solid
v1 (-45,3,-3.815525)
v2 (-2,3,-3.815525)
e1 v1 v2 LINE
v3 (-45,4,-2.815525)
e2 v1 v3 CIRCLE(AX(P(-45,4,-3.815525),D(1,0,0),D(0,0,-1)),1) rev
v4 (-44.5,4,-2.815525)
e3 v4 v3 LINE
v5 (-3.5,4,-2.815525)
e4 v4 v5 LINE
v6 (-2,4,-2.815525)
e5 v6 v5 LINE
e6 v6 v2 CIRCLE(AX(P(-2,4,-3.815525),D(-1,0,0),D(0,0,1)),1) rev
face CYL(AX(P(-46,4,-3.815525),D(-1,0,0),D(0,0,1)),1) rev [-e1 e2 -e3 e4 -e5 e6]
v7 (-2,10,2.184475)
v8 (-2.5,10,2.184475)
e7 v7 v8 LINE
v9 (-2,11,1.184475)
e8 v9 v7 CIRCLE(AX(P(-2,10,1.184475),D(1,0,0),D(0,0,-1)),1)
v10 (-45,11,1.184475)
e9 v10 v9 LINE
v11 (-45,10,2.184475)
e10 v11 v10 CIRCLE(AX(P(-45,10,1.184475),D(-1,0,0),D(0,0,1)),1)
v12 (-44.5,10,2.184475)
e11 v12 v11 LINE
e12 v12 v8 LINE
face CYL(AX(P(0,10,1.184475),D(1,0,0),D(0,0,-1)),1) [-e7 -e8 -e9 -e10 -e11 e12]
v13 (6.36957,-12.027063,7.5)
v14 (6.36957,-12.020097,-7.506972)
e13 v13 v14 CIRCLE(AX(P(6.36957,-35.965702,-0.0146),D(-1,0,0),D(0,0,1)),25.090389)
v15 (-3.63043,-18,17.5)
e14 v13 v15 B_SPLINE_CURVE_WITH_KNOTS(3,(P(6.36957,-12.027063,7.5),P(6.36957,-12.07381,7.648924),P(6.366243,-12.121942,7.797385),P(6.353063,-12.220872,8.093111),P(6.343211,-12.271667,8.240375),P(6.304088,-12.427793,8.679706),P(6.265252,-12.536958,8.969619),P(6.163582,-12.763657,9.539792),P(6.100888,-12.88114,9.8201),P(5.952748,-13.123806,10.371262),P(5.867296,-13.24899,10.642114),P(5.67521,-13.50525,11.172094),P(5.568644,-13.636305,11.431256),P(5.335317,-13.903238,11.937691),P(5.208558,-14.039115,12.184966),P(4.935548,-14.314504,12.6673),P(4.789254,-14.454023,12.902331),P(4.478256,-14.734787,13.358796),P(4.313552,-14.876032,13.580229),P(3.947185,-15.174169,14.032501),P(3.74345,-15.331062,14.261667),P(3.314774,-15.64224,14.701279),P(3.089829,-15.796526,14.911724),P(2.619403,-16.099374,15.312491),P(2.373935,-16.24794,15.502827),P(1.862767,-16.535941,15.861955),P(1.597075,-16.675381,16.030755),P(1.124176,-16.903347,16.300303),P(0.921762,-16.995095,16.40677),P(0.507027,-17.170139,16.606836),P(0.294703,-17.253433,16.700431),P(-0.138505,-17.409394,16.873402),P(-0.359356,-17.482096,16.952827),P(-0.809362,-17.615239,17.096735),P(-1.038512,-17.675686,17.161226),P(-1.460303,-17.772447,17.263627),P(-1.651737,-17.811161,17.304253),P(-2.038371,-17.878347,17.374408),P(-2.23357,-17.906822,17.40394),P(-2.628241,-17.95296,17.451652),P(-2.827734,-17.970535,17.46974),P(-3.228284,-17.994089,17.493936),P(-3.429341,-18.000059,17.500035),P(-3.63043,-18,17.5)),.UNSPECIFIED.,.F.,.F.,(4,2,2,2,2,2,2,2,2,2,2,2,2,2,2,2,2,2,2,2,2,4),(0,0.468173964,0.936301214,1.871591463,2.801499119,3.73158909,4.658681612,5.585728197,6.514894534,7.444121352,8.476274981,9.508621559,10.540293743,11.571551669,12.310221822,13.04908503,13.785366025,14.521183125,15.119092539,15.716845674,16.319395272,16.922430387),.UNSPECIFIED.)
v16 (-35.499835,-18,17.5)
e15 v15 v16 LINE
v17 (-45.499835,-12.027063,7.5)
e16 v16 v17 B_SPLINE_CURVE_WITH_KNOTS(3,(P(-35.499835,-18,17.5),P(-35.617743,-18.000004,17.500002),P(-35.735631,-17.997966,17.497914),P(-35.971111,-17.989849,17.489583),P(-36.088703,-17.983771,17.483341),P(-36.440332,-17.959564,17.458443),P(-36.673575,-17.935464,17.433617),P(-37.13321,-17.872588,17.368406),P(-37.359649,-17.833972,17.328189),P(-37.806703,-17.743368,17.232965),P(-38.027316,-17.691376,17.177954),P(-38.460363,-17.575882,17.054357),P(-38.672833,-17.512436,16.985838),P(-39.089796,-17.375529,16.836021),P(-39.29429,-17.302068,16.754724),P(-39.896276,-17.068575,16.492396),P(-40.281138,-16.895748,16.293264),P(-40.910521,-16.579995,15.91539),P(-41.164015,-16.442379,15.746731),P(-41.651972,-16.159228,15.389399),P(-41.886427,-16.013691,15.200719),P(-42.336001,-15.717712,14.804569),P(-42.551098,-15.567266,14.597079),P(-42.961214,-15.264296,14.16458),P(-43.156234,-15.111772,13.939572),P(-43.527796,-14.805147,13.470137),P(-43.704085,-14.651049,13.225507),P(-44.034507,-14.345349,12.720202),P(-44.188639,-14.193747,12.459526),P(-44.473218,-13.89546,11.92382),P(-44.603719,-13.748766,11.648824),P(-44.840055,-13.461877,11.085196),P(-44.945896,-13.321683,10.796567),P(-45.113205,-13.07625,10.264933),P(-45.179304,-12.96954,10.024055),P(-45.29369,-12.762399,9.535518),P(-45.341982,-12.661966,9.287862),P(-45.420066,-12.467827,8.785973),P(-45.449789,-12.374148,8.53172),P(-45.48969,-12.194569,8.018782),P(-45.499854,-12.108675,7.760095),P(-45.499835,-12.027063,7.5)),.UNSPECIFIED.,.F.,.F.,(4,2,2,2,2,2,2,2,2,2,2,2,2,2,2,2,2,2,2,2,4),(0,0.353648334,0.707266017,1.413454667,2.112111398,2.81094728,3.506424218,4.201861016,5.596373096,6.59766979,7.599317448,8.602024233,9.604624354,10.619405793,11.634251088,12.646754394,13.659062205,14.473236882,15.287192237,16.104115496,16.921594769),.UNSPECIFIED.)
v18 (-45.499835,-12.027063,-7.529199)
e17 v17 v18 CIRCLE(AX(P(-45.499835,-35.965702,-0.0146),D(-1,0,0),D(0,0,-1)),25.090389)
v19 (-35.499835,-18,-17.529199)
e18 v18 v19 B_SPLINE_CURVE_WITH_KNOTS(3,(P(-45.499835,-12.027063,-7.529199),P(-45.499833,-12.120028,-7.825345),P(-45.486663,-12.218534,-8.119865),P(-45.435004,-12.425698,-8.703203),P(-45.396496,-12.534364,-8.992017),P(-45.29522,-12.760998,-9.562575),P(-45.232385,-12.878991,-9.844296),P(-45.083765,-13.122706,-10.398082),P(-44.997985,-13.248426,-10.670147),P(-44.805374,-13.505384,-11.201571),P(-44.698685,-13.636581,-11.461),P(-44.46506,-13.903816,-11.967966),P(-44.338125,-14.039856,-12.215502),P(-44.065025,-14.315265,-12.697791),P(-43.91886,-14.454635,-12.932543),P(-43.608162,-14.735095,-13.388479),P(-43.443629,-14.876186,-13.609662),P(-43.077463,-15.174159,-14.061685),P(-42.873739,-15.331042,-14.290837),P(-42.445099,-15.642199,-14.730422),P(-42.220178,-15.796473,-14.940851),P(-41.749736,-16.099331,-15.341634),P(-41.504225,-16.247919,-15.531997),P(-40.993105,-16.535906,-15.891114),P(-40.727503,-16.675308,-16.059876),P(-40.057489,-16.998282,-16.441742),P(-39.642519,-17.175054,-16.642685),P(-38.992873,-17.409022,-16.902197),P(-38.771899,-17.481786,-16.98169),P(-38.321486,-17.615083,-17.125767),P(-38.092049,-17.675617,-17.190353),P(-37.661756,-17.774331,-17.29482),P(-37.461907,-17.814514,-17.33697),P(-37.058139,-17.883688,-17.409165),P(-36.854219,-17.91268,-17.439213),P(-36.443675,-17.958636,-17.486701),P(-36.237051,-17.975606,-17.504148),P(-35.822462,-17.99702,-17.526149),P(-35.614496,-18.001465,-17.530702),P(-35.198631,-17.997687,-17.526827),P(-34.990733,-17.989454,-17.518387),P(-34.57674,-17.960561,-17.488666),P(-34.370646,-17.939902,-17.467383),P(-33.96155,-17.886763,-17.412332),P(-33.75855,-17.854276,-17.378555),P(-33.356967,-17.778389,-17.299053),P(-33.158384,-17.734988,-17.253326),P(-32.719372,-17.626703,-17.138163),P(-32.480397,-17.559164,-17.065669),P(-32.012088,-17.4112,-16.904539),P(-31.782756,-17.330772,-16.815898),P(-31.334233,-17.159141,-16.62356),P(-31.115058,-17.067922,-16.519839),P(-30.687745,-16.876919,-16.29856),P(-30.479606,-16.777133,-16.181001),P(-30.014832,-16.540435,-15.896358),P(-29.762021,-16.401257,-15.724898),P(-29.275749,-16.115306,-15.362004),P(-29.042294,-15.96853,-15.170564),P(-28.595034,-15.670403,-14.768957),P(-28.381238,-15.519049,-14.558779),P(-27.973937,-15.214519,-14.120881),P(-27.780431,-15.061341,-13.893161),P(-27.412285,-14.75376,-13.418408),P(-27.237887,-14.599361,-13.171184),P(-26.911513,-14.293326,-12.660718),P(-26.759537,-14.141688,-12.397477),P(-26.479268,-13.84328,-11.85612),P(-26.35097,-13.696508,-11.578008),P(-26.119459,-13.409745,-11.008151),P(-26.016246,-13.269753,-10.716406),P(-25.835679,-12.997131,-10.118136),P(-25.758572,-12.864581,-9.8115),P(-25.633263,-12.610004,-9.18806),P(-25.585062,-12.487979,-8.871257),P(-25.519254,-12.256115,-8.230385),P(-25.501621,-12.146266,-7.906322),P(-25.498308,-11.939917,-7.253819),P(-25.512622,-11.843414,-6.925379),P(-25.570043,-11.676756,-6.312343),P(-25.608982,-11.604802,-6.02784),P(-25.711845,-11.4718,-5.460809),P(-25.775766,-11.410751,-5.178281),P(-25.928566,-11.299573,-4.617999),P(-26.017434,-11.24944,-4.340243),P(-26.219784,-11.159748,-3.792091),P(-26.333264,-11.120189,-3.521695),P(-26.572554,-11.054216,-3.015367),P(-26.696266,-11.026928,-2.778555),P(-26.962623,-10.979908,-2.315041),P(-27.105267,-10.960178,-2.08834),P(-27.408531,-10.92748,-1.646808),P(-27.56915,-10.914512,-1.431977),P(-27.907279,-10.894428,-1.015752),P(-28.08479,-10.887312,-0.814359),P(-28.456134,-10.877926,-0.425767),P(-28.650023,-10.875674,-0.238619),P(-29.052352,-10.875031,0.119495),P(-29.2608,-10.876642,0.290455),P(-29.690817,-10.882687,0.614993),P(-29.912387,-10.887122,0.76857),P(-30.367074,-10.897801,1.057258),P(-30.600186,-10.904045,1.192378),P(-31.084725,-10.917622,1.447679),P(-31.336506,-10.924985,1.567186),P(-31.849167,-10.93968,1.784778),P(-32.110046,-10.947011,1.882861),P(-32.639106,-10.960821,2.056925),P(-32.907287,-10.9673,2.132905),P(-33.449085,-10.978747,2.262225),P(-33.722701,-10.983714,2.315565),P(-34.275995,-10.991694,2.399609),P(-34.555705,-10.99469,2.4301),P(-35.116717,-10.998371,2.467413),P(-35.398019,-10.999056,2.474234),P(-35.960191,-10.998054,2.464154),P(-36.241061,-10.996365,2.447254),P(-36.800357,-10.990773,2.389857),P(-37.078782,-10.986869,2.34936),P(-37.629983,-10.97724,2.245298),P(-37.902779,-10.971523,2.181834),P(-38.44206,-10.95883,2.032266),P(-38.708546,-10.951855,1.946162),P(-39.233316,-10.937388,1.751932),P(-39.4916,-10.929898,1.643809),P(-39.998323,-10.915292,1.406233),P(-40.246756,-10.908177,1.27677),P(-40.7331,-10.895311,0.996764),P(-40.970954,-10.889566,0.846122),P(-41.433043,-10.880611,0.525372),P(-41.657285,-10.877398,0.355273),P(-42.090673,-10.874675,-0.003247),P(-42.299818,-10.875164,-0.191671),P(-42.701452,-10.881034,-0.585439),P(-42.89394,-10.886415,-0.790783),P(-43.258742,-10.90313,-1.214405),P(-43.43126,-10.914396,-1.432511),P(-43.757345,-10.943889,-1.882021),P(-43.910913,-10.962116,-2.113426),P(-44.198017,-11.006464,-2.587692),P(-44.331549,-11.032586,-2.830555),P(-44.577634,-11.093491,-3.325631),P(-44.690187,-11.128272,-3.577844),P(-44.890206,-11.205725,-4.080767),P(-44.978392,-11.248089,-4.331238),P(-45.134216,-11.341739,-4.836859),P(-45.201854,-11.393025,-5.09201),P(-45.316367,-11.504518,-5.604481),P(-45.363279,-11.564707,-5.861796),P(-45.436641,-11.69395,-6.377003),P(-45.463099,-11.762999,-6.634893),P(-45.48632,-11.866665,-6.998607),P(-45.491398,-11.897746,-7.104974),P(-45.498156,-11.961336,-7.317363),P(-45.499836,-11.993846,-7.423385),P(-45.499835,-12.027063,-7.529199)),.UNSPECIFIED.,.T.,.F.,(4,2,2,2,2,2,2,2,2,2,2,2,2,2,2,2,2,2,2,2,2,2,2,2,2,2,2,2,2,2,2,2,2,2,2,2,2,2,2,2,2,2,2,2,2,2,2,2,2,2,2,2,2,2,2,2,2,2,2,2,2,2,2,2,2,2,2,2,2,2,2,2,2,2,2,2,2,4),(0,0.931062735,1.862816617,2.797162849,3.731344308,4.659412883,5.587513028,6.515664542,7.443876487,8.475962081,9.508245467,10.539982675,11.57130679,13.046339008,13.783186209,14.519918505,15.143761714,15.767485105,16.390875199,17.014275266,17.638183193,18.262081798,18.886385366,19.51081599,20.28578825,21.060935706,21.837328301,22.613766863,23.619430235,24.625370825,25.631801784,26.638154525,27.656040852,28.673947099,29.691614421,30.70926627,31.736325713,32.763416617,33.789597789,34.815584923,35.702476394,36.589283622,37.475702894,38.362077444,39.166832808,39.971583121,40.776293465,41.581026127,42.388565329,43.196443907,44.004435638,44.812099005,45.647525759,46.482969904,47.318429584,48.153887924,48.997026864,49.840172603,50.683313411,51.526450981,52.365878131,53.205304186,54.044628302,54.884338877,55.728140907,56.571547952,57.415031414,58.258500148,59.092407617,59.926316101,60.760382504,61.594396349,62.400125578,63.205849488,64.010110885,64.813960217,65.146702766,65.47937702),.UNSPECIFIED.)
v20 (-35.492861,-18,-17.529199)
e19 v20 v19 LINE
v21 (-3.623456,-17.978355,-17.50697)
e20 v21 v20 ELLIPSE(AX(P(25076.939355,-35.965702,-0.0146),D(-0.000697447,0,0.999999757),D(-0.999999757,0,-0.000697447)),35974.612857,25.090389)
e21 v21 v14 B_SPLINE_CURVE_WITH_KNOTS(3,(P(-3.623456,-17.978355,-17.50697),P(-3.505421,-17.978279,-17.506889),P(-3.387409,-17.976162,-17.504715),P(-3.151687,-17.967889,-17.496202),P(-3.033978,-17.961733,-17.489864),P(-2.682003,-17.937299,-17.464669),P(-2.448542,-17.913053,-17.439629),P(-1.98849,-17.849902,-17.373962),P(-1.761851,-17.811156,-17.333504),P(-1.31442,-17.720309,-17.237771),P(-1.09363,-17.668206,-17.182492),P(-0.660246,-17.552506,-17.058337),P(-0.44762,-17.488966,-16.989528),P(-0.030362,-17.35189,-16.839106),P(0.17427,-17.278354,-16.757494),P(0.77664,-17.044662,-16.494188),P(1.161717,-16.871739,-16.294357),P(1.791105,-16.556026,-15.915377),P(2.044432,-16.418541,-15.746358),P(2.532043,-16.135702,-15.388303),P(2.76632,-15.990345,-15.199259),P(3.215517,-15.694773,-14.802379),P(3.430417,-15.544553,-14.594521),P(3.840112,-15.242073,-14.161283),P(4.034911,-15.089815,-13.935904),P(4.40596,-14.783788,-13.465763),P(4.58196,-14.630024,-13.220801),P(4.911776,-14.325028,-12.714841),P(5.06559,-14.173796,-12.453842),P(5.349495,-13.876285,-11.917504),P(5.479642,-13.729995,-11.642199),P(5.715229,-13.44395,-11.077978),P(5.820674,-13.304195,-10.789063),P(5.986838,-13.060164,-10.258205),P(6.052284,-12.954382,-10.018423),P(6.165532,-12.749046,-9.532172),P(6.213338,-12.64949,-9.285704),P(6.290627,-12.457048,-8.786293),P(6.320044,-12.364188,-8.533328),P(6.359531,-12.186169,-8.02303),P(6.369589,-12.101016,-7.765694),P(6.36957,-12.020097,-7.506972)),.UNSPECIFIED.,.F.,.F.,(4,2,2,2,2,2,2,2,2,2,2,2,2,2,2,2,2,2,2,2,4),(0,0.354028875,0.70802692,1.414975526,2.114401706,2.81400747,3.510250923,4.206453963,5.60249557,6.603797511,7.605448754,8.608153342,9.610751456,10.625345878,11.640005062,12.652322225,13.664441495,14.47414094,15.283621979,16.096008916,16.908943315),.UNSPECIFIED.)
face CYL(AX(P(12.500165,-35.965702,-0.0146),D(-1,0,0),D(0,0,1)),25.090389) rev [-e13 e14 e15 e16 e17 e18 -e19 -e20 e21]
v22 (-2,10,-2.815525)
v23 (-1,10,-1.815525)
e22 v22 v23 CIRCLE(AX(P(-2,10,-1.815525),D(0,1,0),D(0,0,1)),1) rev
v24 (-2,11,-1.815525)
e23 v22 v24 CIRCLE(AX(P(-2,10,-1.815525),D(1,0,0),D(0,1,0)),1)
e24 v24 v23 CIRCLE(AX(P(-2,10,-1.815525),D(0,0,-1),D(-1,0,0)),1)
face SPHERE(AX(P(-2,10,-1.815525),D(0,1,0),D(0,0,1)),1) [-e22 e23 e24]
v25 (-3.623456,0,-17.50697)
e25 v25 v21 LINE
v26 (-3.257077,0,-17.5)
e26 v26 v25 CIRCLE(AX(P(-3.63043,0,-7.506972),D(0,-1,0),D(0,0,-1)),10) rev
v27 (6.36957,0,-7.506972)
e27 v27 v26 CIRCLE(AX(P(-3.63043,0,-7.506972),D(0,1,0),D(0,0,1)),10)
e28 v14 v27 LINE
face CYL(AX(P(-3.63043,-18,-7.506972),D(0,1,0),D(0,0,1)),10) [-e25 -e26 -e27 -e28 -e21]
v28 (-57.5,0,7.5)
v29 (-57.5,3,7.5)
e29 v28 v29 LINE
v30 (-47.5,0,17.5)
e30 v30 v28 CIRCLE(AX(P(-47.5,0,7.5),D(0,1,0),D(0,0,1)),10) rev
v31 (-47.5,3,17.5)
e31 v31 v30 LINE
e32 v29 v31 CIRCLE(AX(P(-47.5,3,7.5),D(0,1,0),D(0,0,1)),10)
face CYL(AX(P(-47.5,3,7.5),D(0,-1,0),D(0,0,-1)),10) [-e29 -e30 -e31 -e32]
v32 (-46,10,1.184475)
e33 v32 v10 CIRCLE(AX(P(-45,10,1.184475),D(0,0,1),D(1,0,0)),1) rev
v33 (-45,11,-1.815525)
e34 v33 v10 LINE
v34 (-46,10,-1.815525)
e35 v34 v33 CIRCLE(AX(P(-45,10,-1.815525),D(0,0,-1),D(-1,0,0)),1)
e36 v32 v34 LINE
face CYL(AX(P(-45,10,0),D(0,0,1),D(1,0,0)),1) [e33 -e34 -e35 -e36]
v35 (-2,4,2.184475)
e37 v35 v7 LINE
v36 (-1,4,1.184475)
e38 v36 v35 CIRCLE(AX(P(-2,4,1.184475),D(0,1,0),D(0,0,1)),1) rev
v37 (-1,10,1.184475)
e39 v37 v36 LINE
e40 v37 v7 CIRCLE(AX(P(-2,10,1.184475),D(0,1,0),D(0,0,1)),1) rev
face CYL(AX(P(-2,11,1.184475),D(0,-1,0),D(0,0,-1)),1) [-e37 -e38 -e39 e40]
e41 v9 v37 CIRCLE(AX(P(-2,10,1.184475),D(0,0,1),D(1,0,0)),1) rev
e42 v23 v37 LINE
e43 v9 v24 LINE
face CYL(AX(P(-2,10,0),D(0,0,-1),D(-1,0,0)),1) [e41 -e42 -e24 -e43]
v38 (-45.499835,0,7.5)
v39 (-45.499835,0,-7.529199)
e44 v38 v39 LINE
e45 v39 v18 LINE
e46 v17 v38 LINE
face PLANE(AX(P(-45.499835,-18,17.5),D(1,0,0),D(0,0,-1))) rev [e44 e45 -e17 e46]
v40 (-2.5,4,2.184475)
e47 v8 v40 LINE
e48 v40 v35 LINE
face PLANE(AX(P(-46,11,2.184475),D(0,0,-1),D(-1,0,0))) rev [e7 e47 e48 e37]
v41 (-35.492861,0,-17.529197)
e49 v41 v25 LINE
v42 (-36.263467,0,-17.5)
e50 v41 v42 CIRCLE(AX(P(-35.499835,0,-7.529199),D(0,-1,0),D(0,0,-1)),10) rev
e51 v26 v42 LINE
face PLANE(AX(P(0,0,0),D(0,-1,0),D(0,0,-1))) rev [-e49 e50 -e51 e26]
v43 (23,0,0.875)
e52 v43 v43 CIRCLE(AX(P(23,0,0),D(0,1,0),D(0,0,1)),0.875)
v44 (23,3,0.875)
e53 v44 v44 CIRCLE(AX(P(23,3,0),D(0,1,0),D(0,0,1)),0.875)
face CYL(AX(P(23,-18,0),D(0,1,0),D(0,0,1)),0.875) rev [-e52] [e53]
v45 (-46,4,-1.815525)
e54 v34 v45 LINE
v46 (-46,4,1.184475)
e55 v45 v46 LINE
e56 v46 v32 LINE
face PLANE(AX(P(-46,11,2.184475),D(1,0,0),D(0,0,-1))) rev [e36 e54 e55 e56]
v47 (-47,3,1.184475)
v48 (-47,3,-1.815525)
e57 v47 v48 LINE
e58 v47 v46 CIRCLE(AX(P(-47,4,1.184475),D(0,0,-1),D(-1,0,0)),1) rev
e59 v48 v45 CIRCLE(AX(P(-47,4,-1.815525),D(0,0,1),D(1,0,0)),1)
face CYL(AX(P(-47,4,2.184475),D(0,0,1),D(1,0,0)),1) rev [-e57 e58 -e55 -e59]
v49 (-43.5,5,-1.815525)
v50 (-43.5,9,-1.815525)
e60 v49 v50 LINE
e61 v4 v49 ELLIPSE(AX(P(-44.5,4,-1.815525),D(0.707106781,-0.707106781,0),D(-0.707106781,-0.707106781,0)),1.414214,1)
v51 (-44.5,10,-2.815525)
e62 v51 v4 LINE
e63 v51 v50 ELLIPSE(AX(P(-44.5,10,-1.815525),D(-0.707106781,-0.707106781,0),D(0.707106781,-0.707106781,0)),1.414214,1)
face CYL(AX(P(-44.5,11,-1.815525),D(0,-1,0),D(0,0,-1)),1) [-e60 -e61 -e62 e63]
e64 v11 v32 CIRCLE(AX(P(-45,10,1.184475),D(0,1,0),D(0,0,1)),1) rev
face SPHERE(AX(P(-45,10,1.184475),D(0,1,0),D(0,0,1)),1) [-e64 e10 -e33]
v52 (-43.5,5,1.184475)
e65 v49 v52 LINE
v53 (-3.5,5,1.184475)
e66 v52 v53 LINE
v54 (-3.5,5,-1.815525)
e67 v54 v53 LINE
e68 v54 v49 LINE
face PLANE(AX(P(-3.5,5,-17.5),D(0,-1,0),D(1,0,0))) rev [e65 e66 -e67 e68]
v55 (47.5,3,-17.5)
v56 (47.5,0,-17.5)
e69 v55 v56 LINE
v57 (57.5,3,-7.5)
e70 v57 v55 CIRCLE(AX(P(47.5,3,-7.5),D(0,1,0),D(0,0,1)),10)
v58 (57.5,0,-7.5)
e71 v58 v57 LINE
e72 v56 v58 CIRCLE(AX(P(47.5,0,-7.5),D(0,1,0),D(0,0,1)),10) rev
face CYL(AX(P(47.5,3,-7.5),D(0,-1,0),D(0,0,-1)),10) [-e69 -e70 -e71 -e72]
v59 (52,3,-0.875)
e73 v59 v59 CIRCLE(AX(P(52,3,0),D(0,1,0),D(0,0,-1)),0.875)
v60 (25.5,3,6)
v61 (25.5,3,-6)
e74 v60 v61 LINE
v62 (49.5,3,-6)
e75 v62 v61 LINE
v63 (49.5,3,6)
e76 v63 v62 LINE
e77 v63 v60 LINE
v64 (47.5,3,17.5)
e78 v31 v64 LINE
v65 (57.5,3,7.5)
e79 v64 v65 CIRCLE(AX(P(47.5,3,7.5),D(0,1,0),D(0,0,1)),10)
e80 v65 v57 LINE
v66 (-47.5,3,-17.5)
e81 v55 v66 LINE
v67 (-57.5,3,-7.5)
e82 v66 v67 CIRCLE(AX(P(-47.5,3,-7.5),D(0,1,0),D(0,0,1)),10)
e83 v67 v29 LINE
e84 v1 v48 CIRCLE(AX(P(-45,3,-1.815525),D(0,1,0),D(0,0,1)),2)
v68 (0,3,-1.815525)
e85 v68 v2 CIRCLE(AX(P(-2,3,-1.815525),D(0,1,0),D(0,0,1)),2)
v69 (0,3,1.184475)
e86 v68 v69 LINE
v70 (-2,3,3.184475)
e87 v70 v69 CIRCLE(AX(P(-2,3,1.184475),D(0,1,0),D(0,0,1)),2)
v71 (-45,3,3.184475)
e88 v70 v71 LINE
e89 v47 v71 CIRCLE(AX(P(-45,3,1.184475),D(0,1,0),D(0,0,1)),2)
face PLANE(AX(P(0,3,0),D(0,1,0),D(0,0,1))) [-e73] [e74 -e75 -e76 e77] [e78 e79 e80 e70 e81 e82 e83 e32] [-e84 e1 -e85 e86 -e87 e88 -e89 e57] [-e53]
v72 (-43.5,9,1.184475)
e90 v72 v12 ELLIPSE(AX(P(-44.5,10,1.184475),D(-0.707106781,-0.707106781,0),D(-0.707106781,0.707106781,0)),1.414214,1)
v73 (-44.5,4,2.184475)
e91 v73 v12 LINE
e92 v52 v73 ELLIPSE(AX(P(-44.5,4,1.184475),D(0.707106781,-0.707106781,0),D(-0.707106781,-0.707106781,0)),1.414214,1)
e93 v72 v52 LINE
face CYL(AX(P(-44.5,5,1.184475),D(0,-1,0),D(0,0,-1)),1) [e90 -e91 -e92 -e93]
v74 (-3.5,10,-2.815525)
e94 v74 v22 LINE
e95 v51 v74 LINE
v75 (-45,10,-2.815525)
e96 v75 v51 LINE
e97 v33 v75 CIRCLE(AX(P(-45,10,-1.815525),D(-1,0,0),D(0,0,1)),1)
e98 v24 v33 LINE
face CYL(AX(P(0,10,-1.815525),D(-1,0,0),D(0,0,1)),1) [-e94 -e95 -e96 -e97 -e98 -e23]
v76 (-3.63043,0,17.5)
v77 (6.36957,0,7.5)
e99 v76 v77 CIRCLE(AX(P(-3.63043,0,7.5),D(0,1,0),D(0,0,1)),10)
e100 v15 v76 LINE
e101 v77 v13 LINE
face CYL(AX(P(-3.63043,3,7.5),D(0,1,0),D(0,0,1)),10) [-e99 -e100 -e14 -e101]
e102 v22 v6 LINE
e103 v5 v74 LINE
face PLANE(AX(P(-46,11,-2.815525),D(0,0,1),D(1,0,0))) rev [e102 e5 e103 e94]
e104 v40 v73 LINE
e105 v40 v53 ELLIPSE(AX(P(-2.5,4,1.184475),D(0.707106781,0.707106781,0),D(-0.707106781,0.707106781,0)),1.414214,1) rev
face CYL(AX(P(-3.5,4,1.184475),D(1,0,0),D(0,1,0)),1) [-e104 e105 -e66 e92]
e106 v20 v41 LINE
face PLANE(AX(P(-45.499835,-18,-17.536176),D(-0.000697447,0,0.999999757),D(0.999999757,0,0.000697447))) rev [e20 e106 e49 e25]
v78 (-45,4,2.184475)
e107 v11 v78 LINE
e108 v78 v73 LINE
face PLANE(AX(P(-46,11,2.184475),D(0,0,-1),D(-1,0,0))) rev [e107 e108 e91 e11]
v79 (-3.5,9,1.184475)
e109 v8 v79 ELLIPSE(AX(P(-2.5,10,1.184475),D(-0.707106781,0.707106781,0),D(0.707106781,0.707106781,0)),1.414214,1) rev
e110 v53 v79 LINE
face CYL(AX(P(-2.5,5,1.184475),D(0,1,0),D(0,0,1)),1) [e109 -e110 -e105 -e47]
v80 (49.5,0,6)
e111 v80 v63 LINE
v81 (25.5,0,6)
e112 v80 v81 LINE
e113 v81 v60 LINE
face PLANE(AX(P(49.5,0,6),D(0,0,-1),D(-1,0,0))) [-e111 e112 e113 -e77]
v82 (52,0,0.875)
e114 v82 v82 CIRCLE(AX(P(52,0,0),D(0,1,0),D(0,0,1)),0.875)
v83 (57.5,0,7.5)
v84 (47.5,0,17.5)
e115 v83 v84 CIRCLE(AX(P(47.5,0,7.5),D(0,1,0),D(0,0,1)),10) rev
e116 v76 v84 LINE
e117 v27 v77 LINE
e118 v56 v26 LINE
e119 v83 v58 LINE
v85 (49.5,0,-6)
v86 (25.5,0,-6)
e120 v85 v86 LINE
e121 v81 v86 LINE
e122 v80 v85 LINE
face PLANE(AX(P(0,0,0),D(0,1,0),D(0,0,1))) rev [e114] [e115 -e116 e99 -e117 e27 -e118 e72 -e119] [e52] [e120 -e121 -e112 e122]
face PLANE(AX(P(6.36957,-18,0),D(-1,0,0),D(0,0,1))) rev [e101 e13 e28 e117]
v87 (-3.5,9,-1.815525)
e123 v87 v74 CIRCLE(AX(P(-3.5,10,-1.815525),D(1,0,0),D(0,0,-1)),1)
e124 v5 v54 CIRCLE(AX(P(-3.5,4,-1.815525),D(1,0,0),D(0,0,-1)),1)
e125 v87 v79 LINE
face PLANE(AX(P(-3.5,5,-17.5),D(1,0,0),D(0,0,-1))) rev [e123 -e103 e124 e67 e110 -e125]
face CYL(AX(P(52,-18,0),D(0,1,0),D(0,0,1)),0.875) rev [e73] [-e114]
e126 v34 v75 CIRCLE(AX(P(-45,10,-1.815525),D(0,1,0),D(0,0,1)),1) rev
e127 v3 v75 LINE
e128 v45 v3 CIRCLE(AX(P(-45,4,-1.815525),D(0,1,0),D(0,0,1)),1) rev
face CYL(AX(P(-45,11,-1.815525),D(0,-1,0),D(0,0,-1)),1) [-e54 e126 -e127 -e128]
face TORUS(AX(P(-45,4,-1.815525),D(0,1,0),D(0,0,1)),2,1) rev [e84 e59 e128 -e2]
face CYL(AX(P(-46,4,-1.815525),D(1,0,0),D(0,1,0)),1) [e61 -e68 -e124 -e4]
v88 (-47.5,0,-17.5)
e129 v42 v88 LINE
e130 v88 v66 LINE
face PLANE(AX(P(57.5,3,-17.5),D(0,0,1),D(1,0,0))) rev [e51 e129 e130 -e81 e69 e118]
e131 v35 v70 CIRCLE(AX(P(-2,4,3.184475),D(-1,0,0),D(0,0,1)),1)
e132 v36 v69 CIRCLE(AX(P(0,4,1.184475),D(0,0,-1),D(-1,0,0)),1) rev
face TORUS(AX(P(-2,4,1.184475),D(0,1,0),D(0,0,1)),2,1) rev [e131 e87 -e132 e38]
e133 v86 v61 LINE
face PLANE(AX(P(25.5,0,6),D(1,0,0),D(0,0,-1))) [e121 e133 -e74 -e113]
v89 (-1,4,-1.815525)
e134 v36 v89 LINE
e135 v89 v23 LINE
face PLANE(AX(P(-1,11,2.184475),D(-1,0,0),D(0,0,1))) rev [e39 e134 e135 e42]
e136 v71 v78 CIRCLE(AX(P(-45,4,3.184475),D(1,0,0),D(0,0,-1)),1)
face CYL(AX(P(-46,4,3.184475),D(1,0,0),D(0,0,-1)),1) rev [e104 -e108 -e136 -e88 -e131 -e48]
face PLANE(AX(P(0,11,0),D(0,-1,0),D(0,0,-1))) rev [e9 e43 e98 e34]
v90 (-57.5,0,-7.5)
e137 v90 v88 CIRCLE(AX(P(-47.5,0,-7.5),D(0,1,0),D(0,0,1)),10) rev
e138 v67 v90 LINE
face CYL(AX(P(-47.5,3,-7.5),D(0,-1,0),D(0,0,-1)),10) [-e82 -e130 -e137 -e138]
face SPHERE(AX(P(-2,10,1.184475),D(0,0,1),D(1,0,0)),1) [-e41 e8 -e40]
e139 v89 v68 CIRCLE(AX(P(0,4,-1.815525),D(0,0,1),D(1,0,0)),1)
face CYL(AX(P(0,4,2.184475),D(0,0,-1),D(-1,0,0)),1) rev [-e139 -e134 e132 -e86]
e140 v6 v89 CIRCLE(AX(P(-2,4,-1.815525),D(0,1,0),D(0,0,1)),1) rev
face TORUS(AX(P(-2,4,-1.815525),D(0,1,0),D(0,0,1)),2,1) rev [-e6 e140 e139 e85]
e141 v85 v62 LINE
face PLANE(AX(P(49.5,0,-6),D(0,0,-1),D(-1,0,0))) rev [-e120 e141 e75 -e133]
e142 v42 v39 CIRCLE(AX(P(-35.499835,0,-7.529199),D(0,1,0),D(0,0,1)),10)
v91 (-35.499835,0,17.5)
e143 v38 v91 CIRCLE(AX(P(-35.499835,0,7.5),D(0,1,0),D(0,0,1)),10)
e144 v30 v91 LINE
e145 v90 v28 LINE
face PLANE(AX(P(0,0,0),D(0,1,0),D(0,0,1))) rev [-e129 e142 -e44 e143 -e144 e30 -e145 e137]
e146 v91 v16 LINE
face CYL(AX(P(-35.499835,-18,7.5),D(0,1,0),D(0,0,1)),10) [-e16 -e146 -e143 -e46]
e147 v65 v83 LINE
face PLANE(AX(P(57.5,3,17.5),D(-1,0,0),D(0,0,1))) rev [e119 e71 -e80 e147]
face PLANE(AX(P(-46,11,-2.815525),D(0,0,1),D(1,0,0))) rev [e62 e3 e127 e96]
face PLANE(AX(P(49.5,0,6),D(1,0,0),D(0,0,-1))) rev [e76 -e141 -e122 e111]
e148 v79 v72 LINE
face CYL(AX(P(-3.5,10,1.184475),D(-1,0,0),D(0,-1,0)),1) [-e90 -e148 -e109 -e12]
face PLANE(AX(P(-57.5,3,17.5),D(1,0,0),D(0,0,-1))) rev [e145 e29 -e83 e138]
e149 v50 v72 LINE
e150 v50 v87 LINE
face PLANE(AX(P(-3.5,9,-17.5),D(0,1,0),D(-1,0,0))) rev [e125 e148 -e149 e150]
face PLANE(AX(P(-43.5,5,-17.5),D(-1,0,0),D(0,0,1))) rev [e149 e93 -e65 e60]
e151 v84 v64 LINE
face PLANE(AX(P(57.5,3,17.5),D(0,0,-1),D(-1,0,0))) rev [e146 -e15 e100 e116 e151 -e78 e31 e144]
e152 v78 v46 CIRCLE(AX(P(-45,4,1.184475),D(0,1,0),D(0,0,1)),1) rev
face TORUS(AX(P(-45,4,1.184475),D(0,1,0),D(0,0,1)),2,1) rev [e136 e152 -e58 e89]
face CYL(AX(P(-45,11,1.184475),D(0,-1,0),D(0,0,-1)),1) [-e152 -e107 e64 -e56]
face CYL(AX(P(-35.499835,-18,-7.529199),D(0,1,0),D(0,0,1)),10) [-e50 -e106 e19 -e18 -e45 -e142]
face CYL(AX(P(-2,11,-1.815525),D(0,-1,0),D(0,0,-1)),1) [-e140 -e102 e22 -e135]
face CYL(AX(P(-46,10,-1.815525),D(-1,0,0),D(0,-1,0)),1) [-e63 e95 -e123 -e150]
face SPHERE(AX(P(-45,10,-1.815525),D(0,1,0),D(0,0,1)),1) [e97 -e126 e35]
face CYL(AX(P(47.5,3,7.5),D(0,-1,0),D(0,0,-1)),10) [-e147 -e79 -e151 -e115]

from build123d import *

# Parameters (mm, degrees)
SKETCH1_W           = 115
SKETCH1_H           = 35
BOSS_EXTRUDE1_DEPTH = 3
FILLET1_R           = 10
SKETCH2_W           = 45
SKETCH2_H           = 5
BOSS_EXTRUDE2_DEPTH = 8
SKETCH3_W           = 40
SKETCH3_H           = 4
CUT_EXTRUDE1_DEPTH  = 62.763488753
FILLET2_R           = 1
SKETCH4_W           = 24
SKETCH4_H           = 12
CUT_EXTRUDE2_DEPTH  = 61.634148794
BOSS_EXTRUDE3_DEPTH = 18
FILLET3_R           = 10
FILLET4_R           = 10
SKETCH12_R          = 0.875
CUT_EXTRUDE3_DEPTH  = 64.675135077
CUT_EXTRUDE4_DEPTH  = 58


# Some blends are built 0.0001 mm under size
with BuildPart() as part:
    # Sketch1 → Boss-Extrude1 (new body)
    with BuildSketch(Plane(origin=(0, 0, 0), x_dir=(1, 0, 0), z_dir=(0, 1, 0))):
        Rectangle(SKETCH1_W, SKETCH1_H)
    extrude(amount=BOSS_EXTRUDE1_DEPTH)

    # Fillet1
    fillet1_edges = [part.edges().sort_by_distance(p)[0] for p in [
        (-57.5, 1.5, -17.5),
        (57.5, 1.5, -17.5),
        (57.5, 1.5, 17.5),
        (-57.5, 1.5, 17.5),
    ]]
    fillet(fillet1_edges, radius=FILLET1_R)

    # Sketch2 → Boss-Extrude2 (add)
    with BuildSketch(Plane(origin=(0, 3, 0), x_dir=(1, 0, 0), z_dir=(0, 1, 0))):
        with Locations((-23.5, 0.315525333)):
            Rectangle(SKETCH2_W, SKETCH2_H)
    extrude(amount=BOSS_EXTRUDE2_DEPTH)

    # Sketch3 → Cut-Extrude1 (cut, through all)
    with BuildSketch(Plane.XY.offset(2.184474667)):
        with Locations((-23.5, 7)):
            Rectangle(SKETCH3_W, SKETCH3_H)
    extrude(amount=-CUT_EXTRUDE1_DEPTH, mode=Mode.SUBTRACT)

    # Fillet2
    fillet2_edges = [part.edges().sort_by_distance(p)[0] for p in [
        (-1, 3, -0.315525333),
        (-1, 7, 2.184474667),
        (-23.5, 3, -2.815525333),
        (-1, 7, -2.815525333),
        (-46, 3, -0.315525333),
        (-46, 7, -2.815525333),
        (-23.5, 3, 2.184474667),
        (-46, 7, 2.184474667),
        (-1, 11, -0.315525333),
        (-23.5, 11, -2.815525333),
        (-46, 11, -0.315525333),
        (-23.5, 11, 2.184474667),
        (-43.5, 7, -2.815525333),
        (-23.5, 9, -2.815525333),
        (-23.5, 5, -2.815525333),
        (-43.5, 7, 2.184474667),
        (-23.5, 5, 2.184474667),
        (-3.5, 7, 2.184474667),
        (-23.5, 9, 2.184474667),
    ]]
    fillet(fillet2_edges, radius=FILLET2_R - 0.0001)  # a hair under: the kernel refuses the full size

    # Sketch4 → Cut-Extrude2 (cut, through all)
    with BuildSketch(Plane(origin=(0, 3, 0), x_dir=(1, 0, 0), z_dir=(0, 1, 0))):
        with Locations((37.5, 0)):
            Rectangle(SKETCH4_W, SKETCH4_H)
    extrude(amount=-CUT_EXTRUDE2_DEPTH, mode=Mode.SUBTRACT)

    # Sketch11 → Boss-Extrude3 (add)
    with BuildSketch(Plane(origin=(0, 0, 0), x_dir=(-1, 0, 0), z_dir=(0, -1, 0))):
        Polygon((-6.369569975, 0), (-6.369569975, -17.5), (45.499835489, -17.5), (45.499835489, 17.536176175), (-6.369569975, 17.5), align=None)
    extrude(amount=BOSS_EXTRUDE3_DEPTH)

    # Fillet3
    # the kernel refuses this fillet: 10 mm, written as the material it takes off along each edge
    with BuildSketch(Plane(origin=(-45.499835489, 0, 17.5), x_dir=(1, 0, 0), z_dir=(0, -1, 0))) as fillet3_piece_1:
        with BuildLine():
            CenterArc((FILLET3_R, -FILLET3_R), FILLET3_R, 90, 90)
            Line((0, -FILLET3_R), (0, 0))
            Line((0, 0), (FILLET3_R, 0))
        make_face()
    extrude(amount=43, mode=Mode.SUBTRACT)
    with BuildSketch(Plane(origin=(-45.499835489, 0, -17.536176175), x_dir=(0, 0, 1), z_dir=(0, -1, 0))) as fillet3_piece_2:
        with BuildLine():
            CenterArc((FILLET3_R * 1.00069769048, -FILLET3_R), FILLET3_R, 90, 90.039960778)
            Line((FILLET3_R * 0.000697933699006, -FILLET3_R * 1.0006974471), (0, 0))
            Line((0, 0), (FILLET3_R * 1.00069769048, 0))
        make_face()
    extrude(amount=43.017442262, mode=Mode.SUBTRACT)

    # Fillet4
    # the kernel refuses this fillet: 10 mm, written as the material it takes off along each edge
    with BuildSketch(Plane(origin=(6.369569975, 0, -17.5), x_dir=(0, 0, 1), z_dir=(0, -1, 0))) as fillet4_piece_1:
        with BuildLine():
            CenterArc((FILLET4_R * 0.99930279595, FILLET4_R), FILLET4_R, 180.039960778, 89.960039222)
            Line((-FILLET4_R * 0.000696960833864, FILLET4_R * 0.999302552903), (0, 0))
            Line((0, 0), (FILLET4_R * 0.99930279595, 0))
        make_face()
    extrude(amount=42.982569899, mode=Mode.SUBTRACT)
    with BuildSketch(Plane(origin=(6.369569975, 0, 17.5), x_dir=(0, 0, -1), z_dir=(0, -1, 0))) as fillet4_piece_2:
        with BuildLine():
            CenterArc((FILLET4_R, -FILLET4_R), FILLET4_R, 90, 90)
            Line((0, -FILLET4_R), (0, 0))
            Line((0, 0), (FILLET4_R, 0))
        make_face()
    extrude(amount=43, mode=Mode.SUBTRACT)

    # Sketch12 → Cut-Extrude3 (cut, through all)
    with BuildSketch(Plane(origin=(0, 3, 0), x_dir=(1, 0, 0), z_dir=(0, 1, 0))):
        with Locations(Location((23, 0, 0), (0, 0, 270))):
            Circle(SKETCH12_R)
        with Locations(Location((52, 0, 0), (0, 0, 270))):
            Circle(SKETCH12_R)
    extrude(amount=-CUT_EXTRUDE3_DEPTH, mode=Mode.SUBTRACT)

    # Sketch13 → Cut-Extrude4 (cut)
    with BuildSketch(Plane.ZY.offset(45.499835489)):
        with BuildLine():
            Line((-17.52919927, -18), (17.5, -18))
            ThreePointArc((17.5, -18), (-0.014599635, -10.875312322), (-17.52919927, -18))
        make_face()
    extrude(amount=-CUT_EXTRUDE4_DEPTH, mode=Mode.SUBTRACT)


solid = part.part
